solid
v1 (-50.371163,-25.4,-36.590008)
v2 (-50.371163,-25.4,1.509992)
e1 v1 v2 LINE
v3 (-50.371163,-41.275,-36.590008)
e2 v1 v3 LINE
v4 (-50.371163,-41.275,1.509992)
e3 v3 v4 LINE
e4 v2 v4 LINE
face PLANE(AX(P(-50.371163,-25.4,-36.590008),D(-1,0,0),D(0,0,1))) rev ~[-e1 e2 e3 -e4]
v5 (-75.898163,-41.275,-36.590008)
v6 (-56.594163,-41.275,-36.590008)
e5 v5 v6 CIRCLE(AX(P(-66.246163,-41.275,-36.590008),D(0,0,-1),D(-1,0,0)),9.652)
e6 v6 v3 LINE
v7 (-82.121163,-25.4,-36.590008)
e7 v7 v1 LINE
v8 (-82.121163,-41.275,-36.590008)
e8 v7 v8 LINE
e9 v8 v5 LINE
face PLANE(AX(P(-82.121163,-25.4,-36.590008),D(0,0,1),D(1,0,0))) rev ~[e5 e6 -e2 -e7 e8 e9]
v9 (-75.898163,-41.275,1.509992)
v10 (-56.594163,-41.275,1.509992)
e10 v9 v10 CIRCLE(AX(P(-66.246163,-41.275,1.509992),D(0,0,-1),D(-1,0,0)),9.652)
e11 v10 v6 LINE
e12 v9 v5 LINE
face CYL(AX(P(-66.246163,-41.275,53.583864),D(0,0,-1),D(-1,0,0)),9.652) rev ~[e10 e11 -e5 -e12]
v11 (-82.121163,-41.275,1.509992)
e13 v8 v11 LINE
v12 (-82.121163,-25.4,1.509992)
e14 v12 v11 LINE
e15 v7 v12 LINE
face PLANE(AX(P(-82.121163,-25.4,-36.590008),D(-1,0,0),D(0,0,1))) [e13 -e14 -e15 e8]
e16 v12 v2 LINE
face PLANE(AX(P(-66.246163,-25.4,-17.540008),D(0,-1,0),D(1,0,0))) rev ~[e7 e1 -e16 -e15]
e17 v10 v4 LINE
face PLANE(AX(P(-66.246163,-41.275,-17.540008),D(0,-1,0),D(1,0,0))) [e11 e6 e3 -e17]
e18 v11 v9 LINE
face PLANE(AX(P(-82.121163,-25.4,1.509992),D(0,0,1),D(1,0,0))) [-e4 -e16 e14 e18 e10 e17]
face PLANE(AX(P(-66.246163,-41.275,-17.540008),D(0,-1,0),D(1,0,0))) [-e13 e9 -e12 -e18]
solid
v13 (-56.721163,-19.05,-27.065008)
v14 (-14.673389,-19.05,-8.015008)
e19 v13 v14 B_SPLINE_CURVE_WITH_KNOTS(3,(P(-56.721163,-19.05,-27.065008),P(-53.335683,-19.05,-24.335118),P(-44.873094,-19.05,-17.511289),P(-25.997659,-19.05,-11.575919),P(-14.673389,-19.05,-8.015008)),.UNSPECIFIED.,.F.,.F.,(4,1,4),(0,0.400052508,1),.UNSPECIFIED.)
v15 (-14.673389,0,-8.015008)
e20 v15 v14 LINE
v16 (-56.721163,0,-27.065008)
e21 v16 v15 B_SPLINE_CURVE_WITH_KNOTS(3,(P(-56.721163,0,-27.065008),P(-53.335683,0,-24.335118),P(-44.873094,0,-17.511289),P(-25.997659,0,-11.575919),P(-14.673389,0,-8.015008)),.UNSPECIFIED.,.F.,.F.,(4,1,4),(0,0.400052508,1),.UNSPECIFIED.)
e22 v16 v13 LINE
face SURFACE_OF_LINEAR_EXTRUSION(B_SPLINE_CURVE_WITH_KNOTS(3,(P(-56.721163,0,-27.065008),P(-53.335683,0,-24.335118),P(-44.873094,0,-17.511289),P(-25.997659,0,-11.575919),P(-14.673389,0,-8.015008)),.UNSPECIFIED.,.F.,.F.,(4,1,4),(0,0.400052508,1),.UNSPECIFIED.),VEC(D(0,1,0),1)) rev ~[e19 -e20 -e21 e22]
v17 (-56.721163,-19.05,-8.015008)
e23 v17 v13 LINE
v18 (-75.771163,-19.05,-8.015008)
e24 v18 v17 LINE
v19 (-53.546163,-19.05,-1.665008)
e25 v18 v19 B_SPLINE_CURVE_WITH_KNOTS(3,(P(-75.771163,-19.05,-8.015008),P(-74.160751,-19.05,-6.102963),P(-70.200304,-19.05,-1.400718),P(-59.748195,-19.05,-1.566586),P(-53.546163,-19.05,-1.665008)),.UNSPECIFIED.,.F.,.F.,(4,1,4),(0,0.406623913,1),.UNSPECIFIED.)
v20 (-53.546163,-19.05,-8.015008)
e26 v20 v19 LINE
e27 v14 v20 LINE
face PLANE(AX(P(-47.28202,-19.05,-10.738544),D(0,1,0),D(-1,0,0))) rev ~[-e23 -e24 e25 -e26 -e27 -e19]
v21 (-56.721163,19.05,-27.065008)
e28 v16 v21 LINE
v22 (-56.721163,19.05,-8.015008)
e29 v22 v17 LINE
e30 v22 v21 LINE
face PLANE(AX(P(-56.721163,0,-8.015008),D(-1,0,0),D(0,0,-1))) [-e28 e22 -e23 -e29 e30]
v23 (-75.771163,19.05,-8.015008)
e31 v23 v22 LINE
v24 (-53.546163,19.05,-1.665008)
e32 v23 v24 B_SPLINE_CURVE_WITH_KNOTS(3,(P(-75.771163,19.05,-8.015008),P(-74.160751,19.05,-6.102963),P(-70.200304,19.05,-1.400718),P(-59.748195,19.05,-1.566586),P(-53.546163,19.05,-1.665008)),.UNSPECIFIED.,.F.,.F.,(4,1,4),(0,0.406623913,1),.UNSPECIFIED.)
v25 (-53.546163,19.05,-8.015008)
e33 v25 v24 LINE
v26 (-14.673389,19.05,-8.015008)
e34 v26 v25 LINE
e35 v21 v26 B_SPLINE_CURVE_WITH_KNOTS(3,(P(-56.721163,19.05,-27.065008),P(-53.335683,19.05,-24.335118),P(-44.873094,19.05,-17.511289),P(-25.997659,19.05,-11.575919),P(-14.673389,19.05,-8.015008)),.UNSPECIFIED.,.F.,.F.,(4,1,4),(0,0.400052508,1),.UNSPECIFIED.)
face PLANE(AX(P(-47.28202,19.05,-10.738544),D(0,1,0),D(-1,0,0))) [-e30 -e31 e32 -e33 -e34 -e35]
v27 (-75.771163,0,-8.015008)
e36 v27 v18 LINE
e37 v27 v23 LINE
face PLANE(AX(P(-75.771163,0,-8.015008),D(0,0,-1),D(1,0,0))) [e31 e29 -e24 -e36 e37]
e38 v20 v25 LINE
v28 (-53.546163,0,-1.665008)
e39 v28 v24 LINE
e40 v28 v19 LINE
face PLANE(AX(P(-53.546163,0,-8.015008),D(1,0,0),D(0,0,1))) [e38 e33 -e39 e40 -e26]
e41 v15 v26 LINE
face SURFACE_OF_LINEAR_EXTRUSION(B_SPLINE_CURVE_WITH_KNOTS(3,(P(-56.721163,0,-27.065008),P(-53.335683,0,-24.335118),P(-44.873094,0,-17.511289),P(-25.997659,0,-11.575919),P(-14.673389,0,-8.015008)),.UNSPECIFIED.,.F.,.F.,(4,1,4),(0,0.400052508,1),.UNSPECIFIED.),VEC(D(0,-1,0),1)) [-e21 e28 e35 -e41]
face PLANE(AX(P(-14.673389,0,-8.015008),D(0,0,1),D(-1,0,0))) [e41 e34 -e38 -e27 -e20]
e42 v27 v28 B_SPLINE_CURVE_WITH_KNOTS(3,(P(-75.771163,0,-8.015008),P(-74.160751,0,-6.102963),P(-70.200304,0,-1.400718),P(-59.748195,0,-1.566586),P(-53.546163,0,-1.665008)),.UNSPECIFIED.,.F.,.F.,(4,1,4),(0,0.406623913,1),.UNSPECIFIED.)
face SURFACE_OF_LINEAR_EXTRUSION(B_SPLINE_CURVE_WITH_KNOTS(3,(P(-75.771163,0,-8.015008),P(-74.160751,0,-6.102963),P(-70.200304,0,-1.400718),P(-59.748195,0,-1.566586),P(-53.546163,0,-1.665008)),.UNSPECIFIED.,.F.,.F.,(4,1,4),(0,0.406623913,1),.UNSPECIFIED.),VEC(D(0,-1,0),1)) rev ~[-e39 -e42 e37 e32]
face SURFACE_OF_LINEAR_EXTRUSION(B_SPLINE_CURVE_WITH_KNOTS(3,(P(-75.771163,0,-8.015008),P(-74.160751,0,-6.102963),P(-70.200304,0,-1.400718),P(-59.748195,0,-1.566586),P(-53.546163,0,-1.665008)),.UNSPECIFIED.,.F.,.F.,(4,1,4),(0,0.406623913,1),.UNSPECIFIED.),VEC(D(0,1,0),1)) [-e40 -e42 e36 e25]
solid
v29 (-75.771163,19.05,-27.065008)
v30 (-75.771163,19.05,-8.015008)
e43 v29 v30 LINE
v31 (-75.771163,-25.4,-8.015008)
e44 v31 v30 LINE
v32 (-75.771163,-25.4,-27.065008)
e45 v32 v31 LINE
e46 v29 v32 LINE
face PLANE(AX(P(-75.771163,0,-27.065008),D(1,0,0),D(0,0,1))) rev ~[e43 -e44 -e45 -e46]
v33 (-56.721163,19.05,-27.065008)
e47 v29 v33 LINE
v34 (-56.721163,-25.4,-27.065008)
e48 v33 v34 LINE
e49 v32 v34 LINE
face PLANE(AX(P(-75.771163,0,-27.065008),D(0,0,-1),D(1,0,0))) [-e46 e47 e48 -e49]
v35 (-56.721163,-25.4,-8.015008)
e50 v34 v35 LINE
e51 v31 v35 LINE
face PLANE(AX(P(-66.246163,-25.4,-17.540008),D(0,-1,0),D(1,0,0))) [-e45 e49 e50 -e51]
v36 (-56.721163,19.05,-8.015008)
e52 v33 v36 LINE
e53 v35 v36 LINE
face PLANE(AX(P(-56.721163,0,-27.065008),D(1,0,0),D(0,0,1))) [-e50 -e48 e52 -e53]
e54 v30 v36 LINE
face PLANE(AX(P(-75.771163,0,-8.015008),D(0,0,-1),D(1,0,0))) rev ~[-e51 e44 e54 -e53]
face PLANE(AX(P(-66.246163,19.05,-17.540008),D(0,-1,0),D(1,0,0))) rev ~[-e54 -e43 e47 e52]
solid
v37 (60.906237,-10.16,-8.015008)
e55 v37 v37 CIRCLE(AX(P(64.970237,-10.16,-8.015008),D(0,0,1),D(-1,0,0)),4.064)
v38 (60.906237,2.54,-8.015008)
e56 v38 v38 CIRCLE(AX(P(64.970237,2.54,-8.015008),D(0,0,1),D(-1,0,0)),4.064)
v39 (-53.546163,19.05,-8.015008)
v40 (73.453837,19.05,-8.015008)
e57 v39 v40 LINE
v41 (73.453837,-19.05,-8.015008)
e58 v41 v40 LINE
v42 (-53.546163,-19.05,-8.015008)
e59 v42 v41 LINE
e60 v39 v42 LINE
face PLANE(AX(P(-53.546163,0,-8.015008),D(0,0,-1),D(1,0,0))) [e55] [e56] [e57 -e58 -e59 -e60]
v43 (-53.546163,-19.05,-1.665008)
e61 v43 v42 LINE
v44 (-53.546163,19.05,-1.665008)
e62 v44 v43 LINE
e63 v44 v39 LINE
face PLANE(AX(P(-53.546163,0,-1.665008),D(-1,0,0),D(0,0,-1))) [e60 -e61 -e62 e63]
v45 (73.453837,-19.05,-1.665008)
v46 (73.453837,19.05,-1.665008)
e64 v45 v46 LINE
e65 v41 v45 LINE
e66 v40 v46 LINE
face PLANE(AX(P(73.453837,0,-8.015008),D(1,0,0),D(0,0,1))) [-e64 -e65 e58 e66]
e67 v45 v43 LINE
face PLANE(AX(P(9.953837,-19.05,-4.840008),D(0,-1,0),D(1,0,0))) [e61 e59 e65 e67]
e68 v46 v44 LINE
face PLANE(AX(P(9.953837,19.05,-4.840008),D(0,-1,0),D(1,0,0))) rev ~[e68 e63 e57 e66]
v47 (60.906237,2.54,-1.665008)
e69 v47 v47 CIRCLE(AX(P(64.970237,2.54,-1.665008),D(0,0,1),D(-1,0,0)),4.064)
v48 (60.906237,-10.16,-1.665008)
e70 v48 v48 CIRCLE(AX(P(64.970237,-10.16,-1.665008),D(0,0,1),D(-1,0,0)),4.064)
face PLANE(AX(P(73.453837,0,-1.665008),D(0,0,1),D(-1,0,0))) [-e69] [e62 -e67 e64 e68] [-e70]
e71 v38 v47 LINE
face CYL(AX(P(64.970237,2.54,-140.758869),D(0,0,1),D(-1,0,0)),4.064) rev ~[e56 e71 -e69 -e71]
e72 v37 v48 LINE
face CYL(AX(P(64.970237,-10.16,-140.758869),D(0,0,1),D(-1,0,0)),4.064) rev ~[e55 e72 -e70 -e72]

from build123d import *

# Parameters (mm, degrees)
F1_DEPTH      = 19.05
F2_DEPTH      = 19.05
F0_W          = 19.05
F0_H          = 19.05
F3_DEPTH      = 25.4
F3_DEPTH_BACK = 19.05
F4_W          = 31.75
F4_H          = 38.1
F4_W_2        = 19.05
F4_H_2        = 19.05
F5_DEPTH      = 15.875
F7_D          = 19.304
F9_D          = 8.128


with BuildPart() as f1:
    # F0 (on Front) → F1 (new body, symmetric)
    with BuildSketch(Plane.XZ):
        Polygon((73.453836826, -1.6650080707), (-53.546163174, -1.6650080707), (-53.546163174, -8.0150080707), (-14.6733894944, -8.0150080707), (73.453836826, -8.0150080707), align=None)
    extrude(amount=F1_DEPTH, both=True)

    # F9 (through all)
    with Locations(Plane(origin=(0, 0, -8.0150080707), x_dir=(1, 0, 0), z_dir=(0, 0, -1))):
        with Locations((64.970236826, 10.16), (64.970236826, -2.54)):
            Hole(F9_D / 2)


with BuildPart() as f2:
    # F0 (on Front) → F2 (new body, symmetric)
    with BuildSketch(Plane.XZ):
        with BuildLine():
            add(Edge.make_bspline(
                [(-75.771163174, -8.0150080707), (-74.1607508996, -6.1029628681), (-70.2003043439, -1.40071801), (-59.7481949502, -1.5665859823), (-53.546163174, -1.6650080707)],
                knots=[0, 0, 0, 0, 0.4066239127, 1, 1, 1, 1], degree=3))
            Line((-75.771163174, -8.0150080707), (-56.721163174, -8.0150080707))
            Line((-56.721163174, -8.0150080707), (-56.721163174, -27.0650080707))
            add(Edge.make_bspline(
                [(-56.721163174, -27.0650080707), (-53.3356832439, -24.3351180324), (-44.8730943092, -17.5112887062), (-25.9976593517, -11.5759185238), (-14.6733894944, -8.0150080707)],
                knots=[0, 0, 0, 0, 0.4000525083, 1, 1, 1, 1], degree=3))
            Line((-14.6733894944, -8.0150080707), (-53.546163174, -8.0150080707))
            Line((-53.546163174, -8.0150080707), (-53.546163174, -1.6650080707))
        make_face()
    extrude(amount=F2_DEPTH, both=True)


with BuildPart() as f3:
    # F0 (on Front) → F3 (new body, two sides)
    with BuildSketch(Plane.XZ) as f3_sk:
        with Locations((-66.246163174, -17.5400080707)):
            Rectangle(F0_W, F0_H)
    extrude(amount=F3_DEPTH)
    extrude(f3_sk.sketch, amount=-F3_DEPTH_BACK)


with BuildPart() as f5:
    # F4 (on face) → F5 (new body)
    with BuildSketch(Plane.XZ.offset(25.4)):
        with Locations((-66.246163174, -17.5400080707)):
            Rectangle(F4_W, F4_H)
        with Locations((-66.246163174, -17.5400080707)):
            Rectangle(F4_W_2, F4_H_2, mode=Mode.SUBTRACT)
        with Locations((-66.246163174, -17.5400080707)):
            Rectangle(F4_W_2, F4_H_2)
    extrude(amount=F5_DEPTH)

    # F7 (through all)
    with Locations(Plane.XY.offset(1.5099919293)):
        with Locations((-66.246163174, -41.275)):
            Hole(F7_D / 2)


solid = Compound([f1.part, f2.part, f3.part, f5.part])
